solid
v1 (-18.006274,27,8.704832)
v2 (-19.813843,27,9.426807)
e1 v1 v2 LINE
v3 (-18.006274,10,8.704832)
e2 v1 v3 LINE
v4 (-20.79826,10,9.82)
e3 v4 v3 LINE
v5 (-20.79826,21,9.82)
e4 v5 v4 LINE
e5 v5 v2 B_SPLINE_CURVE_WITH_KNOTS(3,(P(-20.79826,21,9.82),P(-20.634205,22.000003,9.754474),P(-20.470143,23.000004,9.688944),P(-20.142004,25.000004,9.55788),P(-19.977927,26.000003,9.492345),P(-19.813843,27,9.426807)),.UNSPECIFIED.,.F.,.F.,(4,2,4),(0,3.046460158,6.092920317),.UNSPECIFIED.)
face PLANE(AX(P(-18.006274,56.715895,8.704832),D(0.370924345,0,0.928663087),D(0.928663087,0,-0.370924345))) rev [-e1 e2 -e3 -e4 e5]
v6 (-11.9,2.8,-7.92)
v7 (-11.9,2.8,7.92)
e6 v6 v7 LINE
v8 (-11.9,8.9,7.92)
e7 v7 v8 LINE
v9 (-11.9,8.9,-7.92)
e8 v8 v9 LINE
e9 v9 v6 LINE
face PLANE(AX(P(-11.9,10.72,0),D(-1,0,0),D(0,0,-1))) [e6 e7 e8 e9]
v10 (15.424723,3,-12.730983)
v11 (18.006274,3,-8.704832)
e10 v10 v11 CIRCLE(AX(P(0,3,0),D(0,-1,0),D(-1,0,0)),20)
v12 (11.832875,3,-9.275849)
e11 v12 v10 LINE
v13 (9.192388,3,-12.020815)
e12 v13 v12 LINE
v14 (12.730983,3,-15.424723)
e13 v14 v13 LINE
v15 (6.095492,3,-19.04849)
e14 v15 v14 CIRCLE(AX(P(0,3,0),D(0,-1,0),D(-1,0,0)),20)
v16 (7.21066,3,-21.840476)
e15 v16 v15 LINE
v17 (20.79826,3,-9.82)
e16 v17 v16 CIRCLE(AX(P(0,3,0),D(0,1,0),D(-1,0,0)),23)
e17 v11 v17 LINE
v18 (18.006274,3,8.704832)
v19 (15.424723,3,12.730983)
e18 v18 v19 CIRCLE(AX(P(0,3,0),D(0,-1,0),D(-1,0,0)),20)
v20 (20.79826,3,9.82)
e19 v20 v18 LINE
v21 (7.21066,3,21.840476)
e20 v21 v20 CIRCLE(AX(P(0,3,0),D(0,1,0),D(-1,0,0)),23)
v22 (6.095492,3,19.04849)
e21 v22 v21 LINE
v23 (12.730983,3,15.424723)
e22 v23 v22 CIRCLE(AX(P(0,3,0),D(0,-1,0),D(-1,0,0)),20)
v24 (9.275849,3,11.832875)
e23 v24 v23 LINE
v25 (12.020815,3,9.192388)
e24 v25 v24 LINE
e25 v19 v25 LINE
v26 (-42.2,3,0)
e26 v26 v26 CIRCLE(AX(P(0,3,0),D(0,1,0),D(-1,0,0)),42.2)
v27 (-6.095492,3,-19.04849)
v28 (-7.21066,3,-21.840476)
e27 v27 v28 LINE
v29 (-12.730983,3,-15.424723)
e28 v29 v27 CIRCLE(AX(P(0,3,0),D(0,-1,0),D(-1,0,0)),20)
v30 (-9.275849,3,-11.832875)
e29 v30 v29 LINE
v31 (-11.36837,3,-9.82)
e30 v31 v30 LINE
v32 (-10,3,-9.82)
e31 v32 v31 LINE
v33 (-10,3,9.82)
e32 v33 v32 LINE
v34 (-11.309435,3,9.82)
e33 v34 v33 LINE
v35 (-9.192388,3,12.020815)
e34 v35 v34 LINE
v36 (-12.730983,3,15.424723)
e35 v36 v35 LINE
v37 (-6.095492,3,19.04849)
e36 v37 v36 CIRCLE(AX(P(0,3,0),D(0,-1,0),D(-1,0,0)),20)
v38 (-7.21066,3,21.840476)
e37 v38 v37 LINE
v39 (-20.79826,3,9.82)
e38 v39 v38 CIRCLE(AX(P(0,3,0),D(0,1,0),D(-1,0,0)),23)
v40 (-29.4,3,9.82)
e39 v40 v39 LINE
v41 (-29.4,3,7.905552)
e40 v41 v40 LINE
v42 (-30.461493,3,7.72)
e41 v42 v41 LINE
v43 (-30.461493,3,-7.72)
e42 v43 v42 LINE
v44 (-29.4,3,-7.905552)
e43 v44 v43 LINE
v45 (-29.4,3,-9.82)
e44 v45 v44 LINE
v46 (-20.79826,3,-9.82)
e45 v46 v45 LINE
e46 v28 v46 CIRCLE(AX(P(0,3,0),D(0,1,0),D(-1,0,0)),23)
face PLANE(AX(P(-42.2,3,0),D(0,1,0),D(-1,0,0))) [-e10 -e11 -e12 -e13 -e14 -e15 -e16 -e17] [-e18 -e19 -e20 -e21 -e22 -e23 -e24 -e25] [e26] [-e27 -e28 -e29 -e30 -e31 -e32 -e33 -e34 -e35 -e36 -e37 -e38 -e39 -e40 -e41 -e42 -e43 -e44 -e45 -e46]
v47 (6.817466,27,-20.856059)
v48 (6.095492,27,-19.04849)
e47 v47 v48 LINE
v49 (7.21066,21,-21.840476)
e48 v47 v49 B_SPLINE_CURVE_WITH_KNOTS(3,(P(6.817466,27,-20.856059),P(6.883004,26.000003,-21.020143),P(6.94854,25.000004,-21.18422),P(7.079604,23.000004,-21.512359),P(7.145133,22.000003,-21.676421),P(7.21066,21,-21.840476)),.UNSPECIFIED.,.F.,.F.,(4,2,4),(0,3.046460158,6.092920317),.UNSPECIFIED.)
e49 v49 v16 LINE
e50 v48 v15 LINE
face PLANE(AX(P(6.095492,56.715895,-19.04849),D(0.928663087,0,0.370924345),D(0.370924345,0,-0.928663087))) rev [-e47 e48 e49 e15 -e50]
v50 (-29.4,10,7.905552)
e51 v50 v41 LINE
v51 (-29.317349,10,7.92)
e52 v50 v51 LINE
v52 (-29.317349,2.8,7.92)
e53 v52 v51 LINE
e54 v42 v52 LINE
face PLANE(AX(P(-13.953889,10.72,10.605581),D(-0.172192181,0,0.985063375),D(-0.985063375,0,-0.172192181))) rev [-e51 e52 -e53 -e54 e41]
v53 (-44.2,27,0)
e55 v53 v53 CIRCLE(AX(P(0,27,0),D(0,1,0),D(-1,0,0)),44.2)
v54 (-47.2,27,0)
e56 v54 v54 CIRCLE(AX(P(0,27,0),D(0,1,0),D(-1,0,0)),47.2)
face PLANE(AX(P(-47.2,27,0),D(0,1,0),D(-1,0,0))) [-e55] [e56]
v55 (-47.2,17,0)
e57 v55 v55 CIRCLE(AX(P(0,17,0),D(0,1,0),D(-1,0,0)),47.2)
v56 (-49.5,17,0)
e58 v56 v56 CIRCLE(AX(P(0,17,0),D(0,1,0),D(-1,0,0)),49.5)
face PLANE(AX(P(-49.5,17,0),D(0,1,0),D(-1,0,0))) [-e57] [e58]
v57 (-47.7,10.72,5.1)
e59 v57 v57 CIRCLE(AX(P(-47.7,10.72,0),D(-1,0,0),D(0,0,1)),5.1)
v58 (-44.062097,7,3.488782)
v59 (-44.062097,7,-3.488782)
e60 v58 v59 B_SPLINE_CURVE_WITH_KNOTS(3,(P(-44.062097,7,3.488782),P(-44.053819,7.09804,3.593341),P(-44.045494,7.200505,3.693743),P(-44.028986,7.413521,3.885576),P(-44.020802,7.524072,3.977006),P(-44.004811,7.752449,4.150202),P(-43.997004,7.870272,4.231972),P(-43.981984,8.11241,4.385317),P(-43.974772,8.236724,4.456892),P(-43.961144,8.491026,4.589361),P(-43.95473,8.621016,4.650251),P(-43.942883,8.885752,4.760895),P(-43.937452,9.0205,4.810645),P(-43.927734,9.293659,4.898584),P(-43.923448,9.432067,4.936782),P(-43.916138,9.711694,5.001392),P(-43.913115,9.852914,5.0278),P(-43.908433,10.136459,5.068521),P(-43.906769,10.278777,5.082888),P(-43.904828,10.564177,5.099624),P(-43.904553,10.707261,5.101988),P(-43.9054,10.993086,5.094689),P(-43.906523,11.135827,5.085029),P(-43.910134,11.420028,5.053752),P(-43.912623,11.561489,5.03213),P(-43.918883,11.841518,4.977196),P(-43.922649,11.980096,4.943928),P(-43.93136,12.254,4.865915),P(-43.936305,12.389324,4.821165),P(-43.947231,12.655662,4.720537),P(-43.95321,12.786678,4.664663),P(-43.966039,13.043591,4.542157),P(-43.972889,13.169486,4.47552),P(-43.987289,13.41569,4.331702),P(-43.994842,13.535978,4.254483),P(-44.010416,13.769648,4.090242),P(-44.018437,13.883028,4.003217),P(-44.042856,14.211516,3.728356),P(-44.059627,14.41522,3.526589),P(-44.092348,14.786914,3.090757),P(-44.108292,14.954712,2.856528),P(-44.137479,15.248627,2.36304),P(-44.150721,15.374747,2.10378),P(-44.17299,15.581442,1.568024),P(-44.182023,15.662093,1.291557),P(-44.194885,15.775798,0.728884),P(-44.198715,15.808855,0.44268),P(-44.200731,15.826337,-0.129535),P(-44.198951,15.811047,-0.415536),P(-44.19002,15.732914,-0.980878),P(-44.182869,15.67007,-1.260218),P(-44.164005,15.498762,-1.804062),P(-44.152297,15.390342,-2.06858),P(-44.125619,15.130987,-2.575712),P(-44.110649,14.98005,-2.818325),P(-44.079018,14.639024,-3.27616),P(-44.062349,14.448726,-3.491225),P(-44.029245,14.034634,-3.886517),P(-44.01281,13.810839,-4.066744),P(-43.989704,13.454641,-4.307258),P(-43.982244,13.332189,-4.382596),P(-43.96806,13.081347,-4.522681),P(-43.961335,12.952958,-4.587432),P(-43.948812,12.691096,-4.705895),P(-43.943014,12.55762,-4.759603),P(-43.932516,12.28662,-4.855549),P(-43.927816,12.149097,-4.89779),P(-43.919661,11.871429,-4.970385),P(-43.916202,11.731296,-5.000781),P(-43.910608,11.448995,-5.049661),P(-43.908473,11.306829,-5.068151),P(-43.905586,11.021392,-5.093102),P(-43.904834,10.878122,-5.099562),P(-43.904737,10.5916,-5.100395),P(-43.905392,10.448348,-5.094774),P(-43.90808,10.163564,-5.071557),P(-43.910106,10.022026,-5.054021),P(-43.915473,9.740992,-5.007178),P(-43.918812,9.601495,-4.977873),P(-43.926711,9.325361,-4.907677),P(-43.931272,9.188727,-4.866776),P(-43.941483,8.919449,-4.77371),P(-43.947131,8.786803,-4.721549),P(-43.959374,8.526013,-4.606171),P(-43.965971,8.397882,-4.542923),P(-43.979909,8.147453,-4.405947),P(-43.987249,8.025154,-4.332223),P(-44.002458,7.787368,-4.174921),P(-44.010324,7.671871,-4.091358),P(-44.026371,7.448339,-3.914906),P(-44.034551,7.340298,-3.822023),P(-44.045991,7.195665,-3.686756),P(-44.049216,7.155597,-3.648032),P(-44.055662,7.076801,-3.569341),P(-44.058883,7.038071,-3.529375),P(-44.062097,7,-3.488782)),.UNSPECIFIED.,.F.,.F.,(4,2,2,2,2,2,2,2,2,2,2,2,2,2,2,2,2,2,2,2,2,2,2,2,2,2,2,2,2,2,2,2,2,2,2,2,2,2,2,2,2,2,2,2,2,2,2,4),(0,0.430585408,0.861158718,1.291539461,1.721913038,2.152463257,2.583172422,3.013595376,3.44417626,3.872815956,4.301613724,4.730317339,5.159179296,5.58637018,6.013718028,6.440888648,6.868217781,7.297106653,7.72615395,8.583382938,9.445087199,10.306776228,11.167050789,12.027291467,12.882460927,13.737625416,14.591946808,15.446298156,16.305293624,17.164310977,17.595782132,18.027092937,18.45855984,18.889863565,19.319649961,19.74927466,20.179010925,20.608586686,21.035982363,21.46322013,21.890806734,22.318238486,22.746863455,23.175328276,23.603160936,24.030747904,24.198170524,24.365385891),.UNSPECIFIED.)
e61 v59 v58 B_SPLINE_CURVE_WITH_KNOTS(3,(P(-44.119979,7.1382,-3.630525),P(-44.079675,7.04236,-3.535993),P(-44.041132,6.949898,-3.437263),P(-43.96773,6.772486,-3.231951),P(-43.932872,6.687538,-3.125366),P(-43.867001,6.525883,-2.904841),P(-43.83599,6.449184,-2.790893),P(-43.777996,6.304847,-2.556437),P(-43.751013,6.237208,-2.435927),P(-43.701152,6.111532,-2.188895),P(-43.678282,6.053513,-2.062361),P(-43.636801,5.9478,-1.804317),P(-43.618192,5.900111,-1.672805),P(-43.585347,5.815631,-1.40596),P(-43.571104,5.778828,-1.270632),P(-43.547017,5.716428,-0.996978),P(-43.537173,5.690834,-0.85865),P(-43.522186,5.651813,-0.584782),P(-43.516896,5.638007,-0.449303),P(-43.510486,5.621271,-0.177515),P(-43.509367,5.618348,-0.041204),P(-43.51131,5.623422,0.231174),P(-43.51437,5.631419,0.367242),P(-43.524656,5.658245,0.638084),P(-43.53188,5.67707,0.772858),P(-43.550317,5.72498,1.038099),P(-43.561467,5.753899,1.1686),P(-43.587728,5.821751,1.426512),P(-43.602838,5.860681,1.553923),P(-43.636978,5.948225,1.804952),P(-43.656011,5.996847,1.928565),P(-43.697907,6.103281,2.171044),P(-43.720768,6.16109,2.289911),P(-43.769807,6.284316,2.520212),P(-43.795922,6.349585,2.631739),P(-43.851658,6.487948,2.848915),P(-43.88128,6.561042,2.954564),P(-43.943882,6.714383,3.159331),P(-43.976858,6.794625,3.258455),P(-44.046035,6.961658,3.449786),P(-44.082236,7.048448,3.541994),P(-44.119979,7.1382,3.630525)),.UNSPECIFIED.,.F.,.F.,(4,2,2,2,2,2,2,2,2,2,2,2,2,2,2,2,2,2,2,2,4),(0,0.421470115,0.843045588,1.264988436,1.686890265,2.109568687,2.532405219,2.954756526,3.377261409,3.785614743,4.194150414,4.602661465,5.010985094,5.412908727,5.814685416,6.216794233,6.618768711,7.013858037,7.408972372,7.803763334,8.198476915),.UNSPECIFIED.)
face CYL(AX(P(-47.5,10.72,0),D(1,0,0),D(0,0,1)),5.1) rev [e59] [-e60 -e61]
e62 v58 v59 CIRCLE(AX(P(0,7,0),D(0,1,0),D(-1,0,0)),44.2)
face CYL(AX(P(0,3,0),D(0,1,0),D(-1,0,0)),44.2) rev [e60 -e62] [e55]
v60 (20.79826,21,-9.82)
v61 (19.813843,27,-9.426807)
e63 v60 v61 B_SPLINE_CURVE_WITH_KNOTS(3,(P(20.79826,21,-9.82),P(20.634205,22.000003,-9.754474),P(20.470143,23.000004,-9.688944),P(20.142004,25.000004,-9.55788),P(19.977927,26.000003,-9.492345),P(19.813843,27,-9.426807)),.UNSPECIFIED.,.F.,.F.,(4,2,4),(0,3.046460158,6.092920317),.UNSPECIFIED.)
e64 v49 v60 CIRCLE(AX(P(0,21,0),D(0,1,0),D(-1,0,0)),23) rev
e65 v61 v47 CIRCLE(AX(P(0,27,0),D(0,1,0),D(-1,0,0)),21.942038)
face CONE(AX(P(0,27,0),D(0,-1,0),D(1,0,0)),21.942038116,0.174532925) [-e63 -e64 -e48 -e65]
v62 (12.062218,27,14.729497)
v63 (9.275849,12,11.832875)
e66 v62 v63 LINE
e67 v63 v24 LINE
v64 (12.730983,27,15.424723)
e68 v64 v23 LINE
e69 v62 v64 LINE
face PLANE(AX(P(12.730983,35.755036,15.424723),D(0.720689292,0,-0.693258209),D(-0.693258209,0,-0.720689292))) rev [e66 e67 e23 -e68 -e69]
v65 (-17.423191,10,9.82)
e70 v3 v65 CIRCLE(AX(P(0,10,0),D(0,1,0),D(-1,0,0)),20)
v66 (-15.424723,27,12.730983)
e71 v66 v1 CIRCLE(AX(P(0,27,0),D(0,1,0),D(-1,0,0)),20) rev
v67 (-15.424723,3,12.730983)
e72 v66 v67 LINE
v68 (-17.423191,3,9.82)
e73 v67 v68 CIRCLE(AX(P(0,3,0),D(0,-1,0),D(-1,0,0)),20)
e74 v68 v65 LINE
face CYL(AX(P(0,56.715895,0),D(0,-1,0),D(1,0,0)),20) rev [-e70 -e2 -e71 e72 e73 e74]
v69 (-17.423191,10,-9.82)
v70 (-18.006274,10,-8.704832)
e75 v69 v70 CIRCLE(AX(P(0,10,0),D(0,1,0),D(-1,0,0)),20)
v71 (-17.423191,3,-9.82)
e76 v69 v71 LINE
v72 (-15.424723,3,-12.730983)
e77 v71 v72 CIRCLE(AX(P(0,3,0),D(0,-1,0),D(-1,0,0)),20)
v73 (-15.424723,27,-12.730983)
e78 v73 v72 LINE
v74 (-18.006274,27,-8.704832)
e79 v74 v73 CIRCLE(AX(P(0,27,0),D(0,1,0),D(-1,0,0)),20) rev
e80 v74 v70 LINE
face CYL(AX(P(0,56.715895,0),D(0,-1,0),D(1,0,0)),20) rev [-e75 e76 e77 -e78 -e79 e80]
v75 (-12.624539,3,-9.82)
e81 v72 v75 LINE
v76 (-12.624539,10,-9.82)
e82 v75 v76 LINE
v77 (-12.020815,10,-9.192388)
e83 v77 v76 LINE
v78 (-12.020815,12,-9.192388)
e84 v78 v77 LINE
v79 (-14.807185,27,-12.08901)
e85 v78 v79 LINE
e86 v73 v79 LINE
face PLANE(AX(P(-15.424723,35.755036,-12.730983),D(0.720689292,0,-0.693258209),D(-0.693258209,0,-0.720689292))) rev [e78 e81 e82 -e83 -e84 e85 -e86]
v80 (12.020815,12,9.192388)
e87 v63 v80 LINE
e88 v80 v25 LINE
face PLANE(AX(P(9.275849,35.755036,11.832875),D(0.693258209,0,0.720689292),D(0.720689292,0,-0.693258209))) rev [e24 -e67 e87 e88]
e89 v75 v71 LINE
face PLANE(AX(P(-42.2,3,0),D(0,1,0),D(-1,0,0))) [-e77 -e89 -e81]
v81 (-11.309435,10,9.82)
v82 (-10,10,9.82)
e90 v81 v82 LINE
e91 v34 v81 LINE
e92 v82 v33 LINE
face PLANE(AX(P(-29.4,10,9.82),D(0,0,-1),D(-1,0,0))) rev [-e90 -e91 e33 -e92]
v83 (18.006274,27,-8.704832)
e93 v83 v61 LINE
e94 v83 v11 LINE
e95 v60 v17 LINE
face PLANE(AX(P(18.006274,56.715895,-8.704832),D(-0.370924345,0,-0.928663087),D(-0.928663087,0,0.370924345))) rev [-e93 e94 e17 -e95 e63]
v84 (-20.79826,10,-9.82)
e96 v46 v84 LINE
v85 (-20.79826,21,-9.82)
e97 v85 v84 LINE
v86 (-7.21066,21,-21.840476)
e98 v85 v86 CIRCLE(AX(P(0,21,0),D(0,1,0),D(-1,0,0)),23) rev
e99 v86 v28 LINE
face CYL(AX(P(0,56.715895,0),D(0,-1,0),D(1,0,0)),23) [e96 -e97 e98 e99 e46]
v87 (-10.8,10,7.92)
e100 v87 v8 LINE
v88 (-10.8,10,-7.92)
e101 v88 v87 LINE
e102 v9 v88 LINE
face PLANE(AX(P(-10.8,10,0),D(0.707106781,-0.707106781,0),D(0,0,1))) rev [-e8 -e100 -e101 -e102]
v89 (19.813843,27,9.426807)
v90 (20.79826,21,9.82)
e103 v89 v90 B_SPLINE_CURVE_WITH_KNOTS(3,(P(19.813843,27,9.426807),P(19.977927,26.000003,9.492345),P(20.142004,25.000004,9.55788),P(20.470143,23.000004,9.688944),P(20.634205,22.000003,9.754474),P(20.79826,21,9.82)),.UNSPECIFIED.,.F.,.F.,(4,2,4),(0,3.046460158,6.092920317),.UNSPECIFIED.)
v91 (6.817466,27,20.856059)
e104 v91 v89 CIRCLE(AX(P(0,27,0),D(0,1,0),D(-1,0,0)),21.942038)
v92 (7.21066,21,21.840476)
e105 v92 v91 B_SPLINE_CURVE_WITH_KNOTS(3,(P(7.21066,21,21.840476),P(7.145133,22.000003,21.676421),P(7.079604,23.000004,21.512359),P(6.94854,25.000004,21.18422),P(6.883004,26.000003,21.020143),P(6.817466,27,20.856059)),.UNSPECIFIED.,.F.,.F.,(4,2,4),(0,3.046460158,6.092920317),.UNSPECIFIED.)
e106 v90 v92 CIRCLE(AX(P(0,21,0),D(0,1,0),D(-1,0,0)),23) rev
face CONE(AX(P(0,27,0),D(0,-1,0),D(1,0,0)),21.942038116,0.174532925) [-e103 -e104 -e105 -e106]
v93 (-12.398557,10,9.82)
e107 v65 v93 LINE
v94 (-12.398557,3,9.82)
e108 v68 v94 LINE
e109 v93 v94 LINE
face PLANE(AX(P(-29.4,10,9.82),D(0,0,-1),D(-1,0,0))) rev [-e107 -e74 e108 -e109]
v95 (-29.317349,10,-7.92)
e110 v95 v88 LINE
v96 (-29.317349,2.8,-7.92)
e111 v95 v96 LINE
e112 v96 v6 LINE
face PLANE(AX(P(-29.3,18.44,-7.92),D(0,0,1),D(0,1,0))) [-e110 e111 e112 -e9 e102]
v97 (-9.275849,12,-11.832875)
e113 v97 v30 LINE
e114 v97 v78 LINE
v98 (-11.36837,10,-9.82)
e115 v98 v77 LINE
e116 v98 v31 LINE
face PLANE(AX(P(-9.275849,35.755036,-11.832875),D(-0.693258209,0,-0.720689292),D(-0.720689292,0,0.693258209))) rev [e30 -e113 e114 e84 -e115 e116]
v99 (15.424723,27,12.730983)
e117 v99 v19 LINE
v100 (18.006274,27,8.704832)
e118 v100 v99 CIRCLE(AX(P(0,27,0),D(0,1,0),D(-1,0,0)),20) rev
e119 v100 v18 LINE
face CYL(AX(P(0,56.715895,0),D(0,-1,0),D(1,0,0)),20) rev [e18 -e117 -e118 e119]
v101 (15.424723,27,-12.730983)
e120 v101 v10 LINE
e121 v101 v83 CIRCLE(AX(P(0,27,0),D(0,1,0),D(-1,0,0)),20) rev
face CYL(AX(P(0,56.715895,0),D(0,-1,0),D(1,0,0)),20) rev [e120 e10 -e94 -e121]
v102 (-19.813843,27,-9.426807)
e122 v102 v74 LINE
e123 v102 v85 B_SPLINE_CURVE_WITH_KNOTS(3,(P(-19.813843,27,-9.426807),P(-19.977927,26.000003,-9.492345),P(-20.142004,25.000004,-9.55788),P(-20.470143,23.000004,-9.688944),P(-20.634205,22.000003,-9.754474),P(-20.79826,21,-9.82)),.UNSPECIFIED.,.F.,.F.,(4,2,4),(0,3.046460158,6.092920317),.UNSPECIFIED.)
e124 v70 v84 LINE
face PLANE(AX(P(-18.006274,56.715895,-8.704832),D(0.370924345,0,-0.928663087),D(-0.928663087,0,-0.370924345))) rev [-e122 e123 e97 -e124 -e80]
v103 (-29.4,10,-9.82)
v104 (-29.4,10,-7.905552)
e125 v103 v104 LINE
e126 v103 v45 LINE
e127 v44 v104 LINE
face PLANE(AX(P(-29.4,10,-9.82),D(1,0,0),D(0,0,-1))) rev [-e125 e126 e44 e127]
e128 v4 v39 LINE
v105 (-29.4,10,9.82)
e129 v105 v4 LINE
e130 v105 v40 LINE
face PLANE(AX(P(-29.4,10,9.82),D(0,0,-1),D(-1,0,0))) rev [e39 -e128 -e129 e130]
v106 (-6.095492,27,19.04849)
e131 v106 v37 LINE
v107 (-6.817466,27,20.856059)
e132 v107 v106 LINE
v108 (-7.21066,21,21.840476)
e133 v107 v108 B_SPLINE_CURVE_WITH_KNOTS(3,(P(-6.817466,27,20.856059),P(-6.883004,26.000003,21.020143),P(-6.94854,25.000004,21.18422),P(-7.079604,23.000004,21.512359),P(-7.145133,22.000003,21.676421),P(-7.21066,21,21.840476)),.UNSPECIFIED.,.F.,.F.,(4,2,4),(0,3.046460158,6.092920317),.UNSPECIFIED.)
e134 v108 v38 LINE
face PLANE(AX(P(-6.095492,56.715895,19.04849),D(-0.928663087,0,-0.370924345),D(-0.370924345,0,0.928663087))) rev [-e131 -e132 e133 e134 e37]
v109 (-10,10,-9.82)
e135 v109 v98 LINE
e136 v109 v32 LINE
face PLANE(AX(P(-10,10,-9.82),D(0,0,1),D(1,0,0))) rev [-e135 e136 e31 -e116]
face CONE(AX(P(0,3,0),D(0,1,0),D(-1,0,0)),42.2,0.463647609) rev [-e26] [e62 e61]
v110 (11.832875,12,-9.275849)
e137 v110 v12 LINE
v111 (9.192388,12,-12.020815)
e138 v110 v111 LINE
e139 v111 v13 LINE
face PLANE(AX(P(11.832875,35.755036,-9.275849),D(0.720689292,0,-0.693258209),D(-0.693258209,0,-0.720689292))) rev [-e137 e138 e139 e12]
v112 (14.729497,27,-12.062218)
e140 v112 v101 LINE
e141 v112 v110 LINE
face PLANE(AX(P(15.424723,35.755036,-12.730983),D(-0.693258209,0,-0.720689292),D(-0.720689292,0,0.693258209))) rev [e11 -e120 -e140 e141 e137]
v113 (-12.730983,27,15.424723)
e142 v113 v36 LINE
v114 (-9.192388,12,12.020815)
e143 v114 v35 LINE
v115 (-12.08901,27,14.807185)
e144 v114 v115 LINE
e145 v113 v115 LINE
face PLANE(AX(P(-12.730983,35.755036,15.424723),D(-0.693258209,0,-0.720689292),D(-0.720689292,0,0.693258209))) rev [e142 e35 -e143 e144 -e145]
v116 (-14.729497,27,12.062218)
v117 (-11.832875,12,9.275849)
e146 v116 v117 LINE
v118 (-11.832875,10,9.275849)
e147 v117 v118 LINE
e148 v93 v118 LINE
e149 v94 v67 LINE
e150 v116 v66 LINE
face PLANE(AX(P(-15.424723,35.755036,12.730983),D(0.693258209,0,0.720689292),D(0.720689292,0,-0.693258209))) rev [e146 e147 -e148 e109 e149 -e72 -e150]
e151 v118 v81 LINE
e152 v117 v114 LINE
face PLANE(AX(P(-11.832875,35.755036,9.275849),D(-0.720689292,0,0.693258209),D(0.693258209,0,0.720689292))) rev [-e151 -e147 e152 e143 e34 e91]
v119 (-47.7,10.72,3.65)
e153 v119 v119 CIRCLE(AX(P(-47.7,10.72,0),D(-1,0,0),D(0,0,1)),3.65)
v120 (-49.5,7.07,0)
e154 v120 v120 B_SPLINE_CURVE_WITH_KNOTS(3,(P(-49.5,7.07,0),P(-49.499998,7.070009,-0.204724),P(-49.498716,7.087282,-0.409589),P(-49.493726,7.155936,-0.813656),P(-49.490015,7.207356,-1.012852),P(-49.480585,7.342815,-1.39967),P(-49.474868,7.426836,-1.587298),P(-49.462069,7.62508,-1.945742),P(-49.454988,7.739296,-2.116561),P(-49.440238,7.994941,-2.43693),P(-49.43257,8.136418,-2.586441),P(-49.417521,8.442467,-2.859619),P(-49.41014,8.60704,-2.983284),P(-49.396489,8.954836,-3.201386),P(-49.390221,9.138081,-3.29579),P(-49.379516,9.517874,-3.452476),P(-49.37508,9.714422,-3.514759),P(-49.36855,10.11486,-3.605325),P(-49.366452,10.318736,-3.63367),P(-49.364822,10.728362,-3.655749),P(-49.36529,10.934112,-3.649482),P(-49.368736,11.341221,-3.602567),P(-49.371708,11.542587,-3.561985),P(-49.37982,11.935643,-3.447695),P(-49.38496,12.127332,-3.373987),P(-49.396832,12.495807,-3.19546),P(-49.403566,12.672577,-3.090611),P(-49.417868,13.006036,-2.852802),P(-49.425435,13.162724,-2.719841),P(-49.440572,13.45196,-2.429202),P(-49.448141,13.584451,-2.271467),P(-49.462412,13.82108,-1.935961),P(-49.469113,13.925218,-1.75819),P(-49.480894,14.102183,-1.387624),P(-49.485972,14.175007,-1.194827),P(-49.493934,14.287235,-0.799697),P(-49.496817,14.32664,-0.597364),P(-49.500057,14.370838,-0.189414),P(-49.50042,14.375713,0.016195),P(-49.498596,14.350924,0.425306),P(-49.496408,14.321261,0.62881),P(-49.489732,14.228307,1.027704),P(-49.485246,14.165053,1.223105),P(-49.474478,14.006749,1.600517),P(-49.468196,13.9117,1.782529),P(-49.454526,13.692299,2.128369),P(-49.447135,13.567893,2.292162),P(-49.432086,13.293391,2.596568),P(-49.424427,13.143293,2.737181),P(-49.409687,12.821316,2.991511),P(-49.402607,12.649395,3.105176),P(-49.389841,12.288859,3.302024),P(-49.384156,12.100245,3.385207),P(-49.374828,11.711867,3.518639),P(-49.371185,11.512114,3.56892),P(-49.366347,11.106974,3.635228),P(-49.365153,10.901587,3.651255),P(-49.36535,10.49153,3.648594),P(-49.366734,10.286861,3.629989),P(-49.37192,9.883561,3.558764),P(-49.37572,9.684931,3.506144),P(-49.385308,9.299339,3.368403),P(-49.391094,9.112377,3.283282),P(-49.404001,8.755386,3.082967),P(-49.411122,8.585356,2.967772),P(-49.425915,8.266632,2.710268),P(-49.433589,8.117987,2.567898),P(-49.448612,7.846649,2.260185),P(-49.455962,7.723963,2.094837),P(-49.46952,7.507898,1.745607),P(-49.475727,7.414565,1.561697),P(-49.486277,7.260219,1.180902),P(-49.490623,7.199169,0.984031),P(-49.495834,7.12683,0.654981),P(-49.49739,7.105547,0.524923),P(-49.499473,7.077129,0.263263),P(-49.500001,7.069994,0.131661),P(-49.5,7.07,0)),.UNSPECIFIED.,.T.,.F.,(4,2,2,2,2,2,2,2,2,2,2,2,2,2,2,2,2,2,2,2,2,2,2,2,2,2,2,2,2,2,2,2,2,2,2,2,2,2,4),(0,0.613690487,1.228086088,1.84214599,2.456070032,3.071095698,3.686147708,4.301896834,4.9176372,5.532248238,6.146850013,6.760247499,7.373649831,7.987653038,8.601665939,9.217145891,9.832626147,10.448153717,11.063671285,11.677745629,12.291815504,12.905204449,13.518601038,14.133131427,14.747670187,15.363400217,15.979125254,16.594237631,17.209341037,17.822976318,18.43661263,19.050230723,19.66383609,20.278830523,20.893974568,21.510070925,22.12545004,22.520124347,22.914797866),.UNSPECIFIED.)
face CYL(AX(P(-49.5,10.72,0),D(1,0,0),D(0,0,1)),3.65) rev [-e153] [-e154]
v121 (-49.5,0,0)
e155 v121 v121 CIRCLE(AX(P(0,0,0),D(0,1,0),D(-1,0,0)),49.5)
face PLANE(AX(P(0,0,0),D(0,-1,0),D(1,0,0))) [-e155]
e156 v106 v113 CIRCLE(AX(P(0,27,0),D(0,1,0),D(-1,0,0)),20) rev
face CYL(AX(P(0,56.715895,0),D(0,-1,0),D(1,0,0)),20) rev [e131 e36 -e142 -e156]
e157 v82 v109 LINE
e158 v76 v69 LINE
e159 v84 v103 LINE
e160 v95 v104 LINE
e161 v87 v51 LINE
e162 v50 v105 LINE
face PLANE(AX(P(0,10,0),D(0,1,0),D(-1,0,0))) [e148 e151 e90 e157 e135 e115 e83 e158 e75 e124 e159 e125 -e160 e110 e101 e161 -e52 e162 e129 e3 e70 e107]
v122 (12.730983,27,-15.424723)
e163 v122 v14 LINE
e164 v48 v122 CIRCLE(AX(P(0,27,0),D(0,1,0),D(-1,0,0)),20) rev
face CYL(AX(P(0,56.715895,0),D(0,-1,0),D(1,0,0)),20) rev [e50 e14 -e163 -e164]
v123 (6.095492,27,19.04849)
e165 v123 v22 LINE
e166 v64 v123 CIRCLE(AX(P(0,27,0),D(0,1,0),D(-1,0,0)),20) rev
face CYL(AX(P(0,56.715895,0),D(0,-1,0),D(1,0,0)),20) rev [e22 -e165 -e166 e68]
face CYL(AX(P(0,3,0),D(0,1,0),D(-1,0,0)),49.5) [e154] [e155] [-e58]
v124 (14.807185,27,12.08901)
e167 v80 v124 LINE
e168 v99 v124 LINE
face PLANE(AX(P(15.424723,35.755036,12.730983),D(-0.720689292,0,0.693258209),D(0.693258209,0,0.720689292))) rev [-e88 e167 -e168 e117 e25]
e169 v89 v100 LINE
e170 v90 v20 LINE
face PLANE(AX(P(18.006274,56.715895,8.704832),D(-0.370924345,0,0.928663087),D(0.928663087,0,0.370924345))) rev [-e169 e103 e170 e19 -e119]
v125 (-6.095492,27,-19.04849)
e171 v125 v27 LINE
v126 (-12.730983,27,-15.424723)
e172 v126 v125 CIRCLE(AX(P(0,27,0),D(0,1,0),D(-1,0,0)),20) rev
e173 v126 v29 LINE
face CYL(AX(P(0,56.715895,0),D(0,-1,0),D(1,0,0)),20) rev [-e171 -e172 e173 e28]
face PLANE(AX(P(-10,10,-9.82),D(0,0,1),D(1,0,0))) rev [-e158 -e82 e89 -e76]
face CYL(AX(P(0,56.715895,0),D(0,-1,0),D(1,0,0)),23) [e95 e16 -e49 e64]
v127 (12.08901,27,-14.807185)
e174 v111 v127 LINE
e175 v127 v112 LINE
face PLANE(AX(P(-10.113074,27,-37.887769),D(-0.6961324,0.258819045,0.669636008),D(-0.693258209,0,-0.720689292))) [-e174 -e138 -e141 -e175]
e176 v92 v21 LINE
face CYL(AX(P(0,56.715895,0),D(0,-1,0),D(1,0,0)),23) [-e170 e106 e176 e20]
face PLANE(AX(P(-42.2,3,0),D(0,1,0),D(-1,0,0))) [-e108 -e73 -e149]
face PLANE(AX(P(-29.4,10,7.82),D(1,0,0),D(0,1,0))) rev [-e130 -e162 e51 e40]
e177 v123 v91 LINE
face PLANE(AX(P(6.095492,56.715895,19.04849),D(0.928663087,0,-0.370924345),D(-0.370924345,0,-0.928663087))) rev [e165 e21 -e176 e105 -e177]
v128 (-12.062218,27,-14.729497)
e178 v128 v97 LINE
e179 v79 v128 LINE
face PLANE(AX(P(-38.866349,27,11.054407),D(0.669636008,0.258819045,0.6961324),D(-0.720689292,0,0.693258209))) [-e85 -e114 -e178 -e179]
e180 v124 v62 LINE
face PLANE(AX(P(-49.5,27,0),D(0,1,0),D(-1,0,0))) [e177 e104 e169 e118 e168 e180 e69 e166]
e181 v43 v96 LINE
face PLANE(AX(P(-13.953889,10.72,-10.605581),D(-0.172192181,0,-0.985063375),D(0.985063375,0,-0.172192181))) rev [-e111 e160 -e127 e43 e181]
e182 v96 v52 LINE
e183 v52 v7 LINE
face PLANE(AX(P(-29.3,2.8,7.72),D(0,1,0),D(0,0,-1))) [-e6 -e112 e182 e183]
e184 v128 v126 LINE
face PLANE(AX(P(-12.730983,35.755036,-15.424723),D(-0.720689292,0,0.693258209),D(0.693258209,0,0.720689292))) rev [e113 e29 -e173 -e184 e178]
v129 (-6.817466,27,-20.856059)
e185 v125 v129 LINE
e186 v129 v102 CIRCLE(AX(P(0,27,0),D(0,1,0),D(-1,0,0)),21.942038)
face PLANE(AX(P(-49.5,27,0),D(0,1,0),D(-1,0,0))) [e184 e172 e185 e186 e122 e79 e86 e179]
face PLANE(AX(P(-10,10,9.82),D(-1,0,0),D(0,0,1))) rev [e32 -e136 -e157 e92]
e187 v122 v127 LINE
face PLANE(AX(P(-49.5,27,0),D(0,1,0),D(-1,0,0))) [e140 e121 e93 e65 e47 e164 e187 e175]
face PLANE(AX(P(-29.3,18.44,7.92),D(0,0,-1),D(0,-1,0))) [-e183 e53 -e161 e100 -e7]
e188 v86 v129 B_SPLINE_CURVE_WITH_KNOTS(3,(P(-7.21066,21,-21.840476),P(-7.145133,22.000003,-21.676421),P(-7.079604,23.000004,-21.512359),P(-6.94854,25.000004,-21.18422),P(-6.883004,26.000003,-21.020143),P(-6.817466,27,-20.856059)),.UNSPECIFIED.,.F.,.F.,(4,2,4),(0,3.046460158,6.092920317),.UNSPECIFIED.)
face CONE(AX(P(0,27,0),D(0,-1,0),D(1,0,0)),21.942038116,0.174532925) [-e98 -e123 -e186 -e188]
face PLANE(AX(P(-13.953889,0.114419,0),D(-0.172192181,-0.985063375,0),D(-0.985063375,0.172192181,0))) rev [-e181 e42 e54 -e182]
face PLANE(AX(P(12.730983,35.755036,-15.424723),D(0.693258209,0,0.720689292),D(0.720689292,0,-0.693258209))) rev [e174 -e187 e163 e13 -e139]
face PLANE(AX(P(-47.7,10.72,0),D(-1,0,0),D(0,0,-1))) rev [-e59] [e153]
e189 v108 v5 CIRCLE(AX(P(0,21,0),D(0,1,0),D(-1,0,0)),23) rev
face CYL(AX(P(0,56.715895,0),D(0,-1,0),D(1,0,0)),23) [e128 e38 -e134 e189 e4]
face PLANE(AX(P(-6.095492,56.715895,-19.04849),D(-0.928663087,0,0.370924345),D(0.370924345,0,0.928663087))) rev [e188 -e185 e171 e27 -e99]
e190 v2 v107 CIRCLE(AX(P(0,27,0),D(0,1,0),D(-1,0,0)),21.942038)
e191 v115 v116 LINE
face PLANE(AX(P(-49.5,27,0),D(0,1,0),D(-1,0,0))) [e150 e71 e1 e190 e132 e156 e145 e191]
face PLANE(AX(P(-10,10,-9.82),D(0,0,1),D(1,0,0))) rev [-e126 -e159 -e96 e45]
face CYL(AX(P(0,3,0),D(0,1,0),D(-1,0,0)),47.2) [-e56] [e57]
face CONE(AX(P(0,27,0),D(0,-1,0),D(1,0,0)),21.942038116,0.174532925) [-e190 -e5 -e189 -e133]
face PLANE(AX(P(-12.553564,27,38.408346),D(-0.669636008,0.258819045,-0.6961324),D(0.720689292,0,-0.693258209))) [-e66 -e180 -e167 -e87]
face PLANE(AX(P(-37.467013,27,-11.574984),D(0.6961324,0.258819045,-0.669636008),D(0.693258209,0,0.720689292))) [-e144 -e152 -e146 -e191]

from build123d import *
from OCP.BRepFilletAPI import BRepFilletAPI_MakeChamfer

# Parameters (mm, degrees)
EXTRUDE_1_DEPTH     = 7
OTHER_START         = -47.7
OTHER_1_OUTLINE_R   = 5.1
OTHER_1_DEPTH       = 35.8
OTHER_START_2       = -30.461492928
OTHER_1_2_DEPTH     = 18.561492928
OTHER_START_3       = -51
OTHER_1_3_OUTLINE_R = 3.65
OTHER_1_3_DEPTH     = 3.3
OTHER_START_4       = 2
OTHER_1_4_DEPTH     = 1
OTHER_START_5       = 2.8
OTHER_1_5_DEPTH     = 7.2
OTHER_START_6       = -3
OTHER_1_6_DEPTH     = 0.709959236
EXTRUDE_2_DEPTH     = 24
EXTRUDE_2_2_DEPTH   = 24
EXTRUDE_2_3_DEPTH   = 24
EXTRUDE_2_4_DEPTH   = 24
CHAMFER_1_SIZE      = 6
CHAMFER_1_SIZE2     = 1.057961884
CHAMFER_2_SIZE      = 6
CHAMFER_2_SIZE2     = 1.057961884
CHAMFER_3_SIZE      = 6
CHAMFER_3_SIZE2     = 1.057961884
CHAMFER_4_SIZE      = 6
CHAMFER_4_SIZE2     = 1.057961884
CHAMFER_5_SIZE      = 1.1
EXTRUDE_3_DEPTH     = 24
CHAMFER_6_SIZE      = 15
CHAMFER_6_SIZE2     = 4.019237886


with BuildPart() as part:
    # Эскиз1 → Повернуть1 (revolve)
    with BuildSketch(Plane.XY):
        Polygon((0, 0), (-49.5, 0), (-49.5, 17), (-47.2, 17), (-47.2, 27), (-44.2, 27), (-44.2, 7), (-42.2, 3), (0, 3), align=None)
    revolve(axis=Axis((0, 3, 0), (0, -1, 0)))

    # Эскиз2 → Бобышка-Вытянуть1 (add)
    with BuildSketch(Plane(origin=(0, 3, 0), x_dir=(1, 0, 0), z_dir=(0, 1, 0))):
        Polygon((-10, -9.82), (-10, 9.82), (-29.4, 9.82), (-29.4, 7.82), (-12, 7.82), (-12, -7.82), (-29.4, -7.82), (-29.4, -9.82), align=None)
    extrude(amount=EXTRUDE_1_DEPTH)

    # Отступ1: read off the stored shape, not the designer's step
    # Отступ1 outline → Отступ1 (cut)
    with BuildSketch(Plane.YZ.offset(OTHER_START)):
        with Locations((10.72, 0)):
            Circle(OTHER_1_OUTLINE_R)
    extrude(amount=OTHER_1_DEPTH, mode=Mode.SUBTRACT)

    # Other 1 2 outline → Other 1 2 (cut)
    with BuildSketch(Plane.YZ.offset(OTHER_START_2)):
        with BuildLine():
            Line((2.8, 7.92), (2.8, -7.92))
            Line((2.8, -7.92), (10, -7.92))
            Line((10, -7.92), (10, -5.048920677))
            ThreePointArc((10, -5.048920677), (5.62, 0), (10, 5.048920677))
            Line((10, 5.048920677), (10, 7.92))
            Line((10, 7.92), (2.8, 7.92))
        make_face()
    extrude(amount=OTHER_1_2_DEPTH, mode=Mode.SUBTRACT)

    # Other 1 3 outline → Other 1 3 (cut)
    with BuildSketch(Plane.YZ.offset(OTHER_START_3)):
        with Locations((10.72, 0)):
            Circle(OTHER_1_3_OUTLINE_R)
    extrude(amount=OTHER_1_3_DEPTH, mode=Mode.SUBTRACT)

    # Other 1 4 outline → Other 1 4 (add)
    with BuildSketch(Plane(origin=(0, 0, 0), x_dir=(1, 0, 0), z_dir=(0, 1, 0)).offset(OTHER_START_4)):
        Polygon((-30.461492928, -7.72), (-30.461492928, -7.92), (-29.317348784, -7.92), align=None)
        Polygon((-30.461492928, 7.92), (-30.461492928, 7.72), (-29.317348784, 7.92), align=None)
    extrude(amount=OTHER_1_4_DEPTH)

    # Other 1 5 outline → Other 1 5 (add)
    with BuildSketch(Plane(origin=(0, 0, 0), x_dir=(1, 0, 0), z_dir=(0, 1, 0)).offset(OTHER_START_5)):
        Polygon((-29.317348784, -7.92), (-29.4, -7.905552307), (-29.4, -7.92), align=None)
        Polygon((-29.4, 7.92), (-29.4, 7.905552307), (-29.317348784, 7.92), align=None)
    extrude(amount=OTHER_1_5_DEPTH)

    # Other 1 6 outline → Other 1 6 (add)
    with BuildSketch(Plane(origin=(0, 0, 0), x_dir=(0.9850633751005737, -0.17219218052939098, 0), z_dir=(0.17219218052939098, 0.9850633751005737, 0)).offset(OTHER_START_6)):
        Polygon((-29.361584648, 7.92), (-30.523077576, 7.72), (-30.523077576, -7.72), (-29.361584648, -7.92), align=None)
    extrude(amount=OTHER_1_6_DEPTH)

    # Фаска5
    chamfer_5_edges = [part.edges().sort_by_distance(p)[0] for p in [
        (-11.9, 10, 0),
    ]]
    chamfer(chamfer_5_edges, length=CHAMFER_5_SIZE)



with BuildPart() as body_2:
    # Эскиз4 → Бобышка-Вытянуть2 (new body)
    with BuildSketch(Plane(origin=(0, 3, 0), x_dir=(1, 0, 0), z_dir=(0, 1, 0))):
        with BuildLine():
            Line((-18.006273941, 8.704831921), (-20.798259543, 9.82))
            ThreePointArc((-20.798259543, 9.82), (-15.239680095, 17.226495598), (-7.210659701, 21.84047588))
            Line((-7.210659701, 21.84047588), (-6.095491622, 19.048490278))
            ThreePointArc((-6.095491622, 19.048490278), (-13.113793992, 15.100609496), (-18.006273941, 8.704831921))
        make_face()
    extrude(amount=EXTRUDE_2_DEPTH)

    # Фаска4
    chamfer_4_edges = [body_2.edges().sort_by_distance(p)[0] for p in [
        (-15.239680095, 27, -17.226495598),
    ]]
    chamfer_4_side = [body_2.faces().sort_by_distance(p)[0] for p in [
        (-15.239680095, 15, -17.226495598),
    ]]
    chamfer(chamfer_4_edges, length=CHAMFER_4_SIZE, length2=CHAMFER_4_SIZE2, reference=chamfer_4_side[0])


with BuildPart() as body_3:
    # Эскиз4 → Extrude 2 2 (new body)
    with BuildSketch(Plane(origin=(0, 3, 0), x_dir=(1, 0, 0), z_dir=(0, 1, 0))):
        with BuildLine():
            Line((-18.006273941, -8.704831921), (-20.798259543, -9.82))
            ThreePointArc((-20.798259543, -9.82), (-15.239680095, -17.226495598), (-7.210659701, -21.84047588))
            Line((-7.210659701, -21.84047588), (-6.095491622, -19.048490278))
            ThreePointArc((-6.095491622, -19.048490278), (-13.113793992, -15.100609496), (-18.006273941, -8.704831921))
        make_face()
    extrude(amount=EXTRUDE_2_2_DEPTH)

    # Фаска1
    chamfer_1_edges = [body_3.edges().sort_by_distance(p)[0] for p in [
        (-15.239680095, 27, 17.226495598),
    ]]
    chamfer_1_side = [body_3.faces().sort_by_distance(p)[0] for p in [
        (-15.239680095, 15, 17.226495598),
    ]]
    chamfer(chamfer_1_edges, length=CHAMFER_1_SIZE, length2=CHAMFER_1_SIZE2, reference=chamfer_1_side[0])


with BuildPart() as body_4:
    # Эскиз4 → Extrude 2 3 (new body)
    with BuildSketch(Plane(origin=(0, 3, 0), x_dir=(1, 0, 0), z_dir=(0, 1, 0))):
        with BuildLine():
            Line((6.095491622, 19.048490278), (7.210659701, 21.84047588))
            ThreePointArc((7.210659701, 21.84047588), (15.239680095, 17.226495598), (20.798259543, 9.82))
            Line((20.798259543, 9.82), (18.006273941, 8.704831921))
            ThreePointArc((18.006273941, 8.704831921), (13.113793992, 15.100609496), (6.095491622, 19.048490278))
        make_face()
    extrude(amount=EXTRUDE_2_3_DEPTH)

    # Фаска3
    chamfer_3_edges = [body_4.edges().sort_by_distance(p)[0] for p in [
        (15.239680095, 27, -17.226495598),
    ]]
    chamfer_3_side = [body_4.faces().sort_by_distance(p)[0] for p in [
        (15.239680095, 15, -17.226495598),
    ]]
    chamfer(chamfer_3_edges, length=CHAMFER_3_SIZE, length2=CHAMFER_3_SIZE2, reference=chamfer_3_side[0])


with BuildPart() as body_5:
    # Эскиз4 → Extrude 2 4 (new body)
    with BuildSketch(Plane(origin=(0, 3, 0), x_dir=(1, 0, 0), z_dir=(0, 1, 0))):
        with BuildLine():
            Line((18.006273941, -8.704831921), (20.798259543, -9.82))
            ThreePointArc((20.798259543, -9.82), (15.239680095, -17.226495598), (7.210659701, -21.84047588))
            Line((7.210659701, -21.84047588), (6.095491622, -19.048490278))
            ThreePointArc((6.095491622, -19.048490278), (13.113793992, -15.100609496), (18.006273941, -8.704831921))
        make_face()
    extrude(amount=EXTRUDE_2_4_DEPTH)

    # Фаска2
    chamfer_2_edges = [body_5.edges().sort_by_distance(p)[0] for p in [
        (15.239680095, 27, 17.226495598),
    ]]
    chamfer_2_side = [body_5.faces().sort_by_distance(p)[0] for p in [
        (15.239680095, 15, 17.226495598),
    ]]
    chamfer(chamfer_2_edges, length=CHAMFER_2_SIZE, length2=CHAMFER_2_SIZE2, reference=chamfer_2_side[0])


with BuildPart() as part_1:
    add(part.part)

    add(body_2.part)  # Бобышка-Вытянуть3 merges body 2

    add(body_3.part)  # Бобышка-Вытянуть3 merges body 3

    add(body_4.part)  # Бобышка-Вытянуть3 merges body 4

    add(body_5.part)  # Бобышка-Вытянуть3 merges body 5
    # Эскиз5 → Бобышка-Вытянуть3 (add)
    with BuildSketch(Plane(origin=(0, 3, 0), x_dir=(1, 0, 0), z_dir=(0, 1, 0))):
        with BuildLine():
            Line((-9.275848781, 11.832874951), (-12.730982797, 15.424722916))
            ThreePointArc((-12.730982797, 15.424722916), (-14.142135624, 14.142135624), (-15.424722916, 12.730982797))
            Line((-15.424722916, 12.730982797), (-12.02081528, 9.192388155))
            Line((-12.02081528, 9.192388155), (-9.275848781, 11.832874951))
        make_face()
        with BuildLine():
            ThreePointArc((15.424722916, 12.730982797), (14.142135624, 14.142135624), (12.730982797, 15.424722916))
            Line((12.730982797, 15.424722916), (9.192388155, 12.02081528))
            Line((9.192388155, 12.02081528), (11.832874951, 9.275848781))
            Line((11.832874951, 9.275848781), (15.424722916, 12.730982797))
        make_face()
        with BuildLine():
            ThreePointArc((12.730982797, -15.424722916), (14.142135624, -14.142135624), (15.424722916, -12.730982797))
            Line((15.424722916, -12.730982797), (12.02081528, -9.192388155))
            Line((12.02081528, -9.192388155), (9.275848781, -11.832874951))
            Line((9.275848781, -11.832874951), (12.730982797, -15.424722916))
        make_face()
        with BuildLine():
            ThreePointArc((-15.424722916, -12.730982797), (-14.142135624, -14.142135624), (-12.730982797, -15.424722916))
            Line((-12.730982797, -15.424722916), (-9.192388155, -12.02081528))
            Line((-9.192388155, -12.02081528), (-11.832874951, -9.275848781))
            Line((-11.832874951, -9.275848781), (-15.424722916, -12.730982797))
        make_face()
    extrude(amount=EXTRUDE_3_DEPTH)

    # Фаска6: one chamfer whose edges measure the first distance from different faces: ONE call of the kernel's chamfer builder (chamfer() names one face for all edges)
    chamfer_6_edges_1 = [part_1.edges().sort_by_distance(p)[0] for p in [
        (-10.648332031, 27, -10.512631553),
    ]]
    chamfer_6_side_1 = [part_1.faces().sort_by_distance(p)[0] for p in [
        (-10.570396404, 15.633162389, -10.587600771),
    ]]
    chamfer_6_edges_2 = [part_1.edges().sort_by_distance(p)[0] for p in [
        (10.512631553, 27, -10.648332031),
    ]]
    chamfer_6_side_2 = [part_1.faces().sort_by_distance(p)[0] for p in [
        (10.512631553, 15, -10.648332031),
    ]]
    chamfer_6_edges_3 = [part_1.edges().sort_by_distance(p)[0] for p in [
        (10.648332031, 27, 10.512631553),
    ]]
    chamfer_6_side_3 = [part_1.faces().sort_by_distance(p)[0] for p in [
        (10.648332031, 15, 10.512631553),
    ]]
    chamfer_6_edges_4 = [part_1.edges().sort_by_distance(p)[0] for p in [
        (-10.512631553, 27, 10.648332031),
    ]]
    chamfer_6_side_4 = [part_1.faces().sort_by_distance(p)[0] for p in [
        (-10.447673128, 15.521619556, 10.715860754),
    ]]
    chamfer_6 = BRepFilletAPI_MakeChamfer(part_1.part.solid().wrapped)
    for e in chamfer_6_edges_1:
        chamfer_6.Add(CHAMFER_6_SIZE, CHAMFER_6_SIZE2, e.wrapped, chamfer_6_side_1[0].wrapped)  # the first distance lies on this face
    for e in chamfer_6_edges_2:
        chamfer_6.Add(CHAMFER_6_SIZE, CHAMFER_6_SIZE2, e.wrapped, chamfer_6_side_2[0].wrapped)  # the first distance lies on this face
    for e in chamfer_6_edges_3:
        chamfer_6.Add(CHAMFER_6_SIZE, CHAMFER_6_SIZE2, e.wrapped, chamfer_6_side_3[0].wrapped)  # the first distance lies on this face
    for e in chamfer_6_edges_4:
        chamfer_6.Add(CHAMFER_6_SIZE, CHAMFER_6_SIZE2, e.wrapped, chamfer_6_side_4[0].wrapped)  # the first distance lies on this face
    add(Compound.cast(chamfer_6.Shape()), mode=Mode.REPLACE)


solid = part_1.part
